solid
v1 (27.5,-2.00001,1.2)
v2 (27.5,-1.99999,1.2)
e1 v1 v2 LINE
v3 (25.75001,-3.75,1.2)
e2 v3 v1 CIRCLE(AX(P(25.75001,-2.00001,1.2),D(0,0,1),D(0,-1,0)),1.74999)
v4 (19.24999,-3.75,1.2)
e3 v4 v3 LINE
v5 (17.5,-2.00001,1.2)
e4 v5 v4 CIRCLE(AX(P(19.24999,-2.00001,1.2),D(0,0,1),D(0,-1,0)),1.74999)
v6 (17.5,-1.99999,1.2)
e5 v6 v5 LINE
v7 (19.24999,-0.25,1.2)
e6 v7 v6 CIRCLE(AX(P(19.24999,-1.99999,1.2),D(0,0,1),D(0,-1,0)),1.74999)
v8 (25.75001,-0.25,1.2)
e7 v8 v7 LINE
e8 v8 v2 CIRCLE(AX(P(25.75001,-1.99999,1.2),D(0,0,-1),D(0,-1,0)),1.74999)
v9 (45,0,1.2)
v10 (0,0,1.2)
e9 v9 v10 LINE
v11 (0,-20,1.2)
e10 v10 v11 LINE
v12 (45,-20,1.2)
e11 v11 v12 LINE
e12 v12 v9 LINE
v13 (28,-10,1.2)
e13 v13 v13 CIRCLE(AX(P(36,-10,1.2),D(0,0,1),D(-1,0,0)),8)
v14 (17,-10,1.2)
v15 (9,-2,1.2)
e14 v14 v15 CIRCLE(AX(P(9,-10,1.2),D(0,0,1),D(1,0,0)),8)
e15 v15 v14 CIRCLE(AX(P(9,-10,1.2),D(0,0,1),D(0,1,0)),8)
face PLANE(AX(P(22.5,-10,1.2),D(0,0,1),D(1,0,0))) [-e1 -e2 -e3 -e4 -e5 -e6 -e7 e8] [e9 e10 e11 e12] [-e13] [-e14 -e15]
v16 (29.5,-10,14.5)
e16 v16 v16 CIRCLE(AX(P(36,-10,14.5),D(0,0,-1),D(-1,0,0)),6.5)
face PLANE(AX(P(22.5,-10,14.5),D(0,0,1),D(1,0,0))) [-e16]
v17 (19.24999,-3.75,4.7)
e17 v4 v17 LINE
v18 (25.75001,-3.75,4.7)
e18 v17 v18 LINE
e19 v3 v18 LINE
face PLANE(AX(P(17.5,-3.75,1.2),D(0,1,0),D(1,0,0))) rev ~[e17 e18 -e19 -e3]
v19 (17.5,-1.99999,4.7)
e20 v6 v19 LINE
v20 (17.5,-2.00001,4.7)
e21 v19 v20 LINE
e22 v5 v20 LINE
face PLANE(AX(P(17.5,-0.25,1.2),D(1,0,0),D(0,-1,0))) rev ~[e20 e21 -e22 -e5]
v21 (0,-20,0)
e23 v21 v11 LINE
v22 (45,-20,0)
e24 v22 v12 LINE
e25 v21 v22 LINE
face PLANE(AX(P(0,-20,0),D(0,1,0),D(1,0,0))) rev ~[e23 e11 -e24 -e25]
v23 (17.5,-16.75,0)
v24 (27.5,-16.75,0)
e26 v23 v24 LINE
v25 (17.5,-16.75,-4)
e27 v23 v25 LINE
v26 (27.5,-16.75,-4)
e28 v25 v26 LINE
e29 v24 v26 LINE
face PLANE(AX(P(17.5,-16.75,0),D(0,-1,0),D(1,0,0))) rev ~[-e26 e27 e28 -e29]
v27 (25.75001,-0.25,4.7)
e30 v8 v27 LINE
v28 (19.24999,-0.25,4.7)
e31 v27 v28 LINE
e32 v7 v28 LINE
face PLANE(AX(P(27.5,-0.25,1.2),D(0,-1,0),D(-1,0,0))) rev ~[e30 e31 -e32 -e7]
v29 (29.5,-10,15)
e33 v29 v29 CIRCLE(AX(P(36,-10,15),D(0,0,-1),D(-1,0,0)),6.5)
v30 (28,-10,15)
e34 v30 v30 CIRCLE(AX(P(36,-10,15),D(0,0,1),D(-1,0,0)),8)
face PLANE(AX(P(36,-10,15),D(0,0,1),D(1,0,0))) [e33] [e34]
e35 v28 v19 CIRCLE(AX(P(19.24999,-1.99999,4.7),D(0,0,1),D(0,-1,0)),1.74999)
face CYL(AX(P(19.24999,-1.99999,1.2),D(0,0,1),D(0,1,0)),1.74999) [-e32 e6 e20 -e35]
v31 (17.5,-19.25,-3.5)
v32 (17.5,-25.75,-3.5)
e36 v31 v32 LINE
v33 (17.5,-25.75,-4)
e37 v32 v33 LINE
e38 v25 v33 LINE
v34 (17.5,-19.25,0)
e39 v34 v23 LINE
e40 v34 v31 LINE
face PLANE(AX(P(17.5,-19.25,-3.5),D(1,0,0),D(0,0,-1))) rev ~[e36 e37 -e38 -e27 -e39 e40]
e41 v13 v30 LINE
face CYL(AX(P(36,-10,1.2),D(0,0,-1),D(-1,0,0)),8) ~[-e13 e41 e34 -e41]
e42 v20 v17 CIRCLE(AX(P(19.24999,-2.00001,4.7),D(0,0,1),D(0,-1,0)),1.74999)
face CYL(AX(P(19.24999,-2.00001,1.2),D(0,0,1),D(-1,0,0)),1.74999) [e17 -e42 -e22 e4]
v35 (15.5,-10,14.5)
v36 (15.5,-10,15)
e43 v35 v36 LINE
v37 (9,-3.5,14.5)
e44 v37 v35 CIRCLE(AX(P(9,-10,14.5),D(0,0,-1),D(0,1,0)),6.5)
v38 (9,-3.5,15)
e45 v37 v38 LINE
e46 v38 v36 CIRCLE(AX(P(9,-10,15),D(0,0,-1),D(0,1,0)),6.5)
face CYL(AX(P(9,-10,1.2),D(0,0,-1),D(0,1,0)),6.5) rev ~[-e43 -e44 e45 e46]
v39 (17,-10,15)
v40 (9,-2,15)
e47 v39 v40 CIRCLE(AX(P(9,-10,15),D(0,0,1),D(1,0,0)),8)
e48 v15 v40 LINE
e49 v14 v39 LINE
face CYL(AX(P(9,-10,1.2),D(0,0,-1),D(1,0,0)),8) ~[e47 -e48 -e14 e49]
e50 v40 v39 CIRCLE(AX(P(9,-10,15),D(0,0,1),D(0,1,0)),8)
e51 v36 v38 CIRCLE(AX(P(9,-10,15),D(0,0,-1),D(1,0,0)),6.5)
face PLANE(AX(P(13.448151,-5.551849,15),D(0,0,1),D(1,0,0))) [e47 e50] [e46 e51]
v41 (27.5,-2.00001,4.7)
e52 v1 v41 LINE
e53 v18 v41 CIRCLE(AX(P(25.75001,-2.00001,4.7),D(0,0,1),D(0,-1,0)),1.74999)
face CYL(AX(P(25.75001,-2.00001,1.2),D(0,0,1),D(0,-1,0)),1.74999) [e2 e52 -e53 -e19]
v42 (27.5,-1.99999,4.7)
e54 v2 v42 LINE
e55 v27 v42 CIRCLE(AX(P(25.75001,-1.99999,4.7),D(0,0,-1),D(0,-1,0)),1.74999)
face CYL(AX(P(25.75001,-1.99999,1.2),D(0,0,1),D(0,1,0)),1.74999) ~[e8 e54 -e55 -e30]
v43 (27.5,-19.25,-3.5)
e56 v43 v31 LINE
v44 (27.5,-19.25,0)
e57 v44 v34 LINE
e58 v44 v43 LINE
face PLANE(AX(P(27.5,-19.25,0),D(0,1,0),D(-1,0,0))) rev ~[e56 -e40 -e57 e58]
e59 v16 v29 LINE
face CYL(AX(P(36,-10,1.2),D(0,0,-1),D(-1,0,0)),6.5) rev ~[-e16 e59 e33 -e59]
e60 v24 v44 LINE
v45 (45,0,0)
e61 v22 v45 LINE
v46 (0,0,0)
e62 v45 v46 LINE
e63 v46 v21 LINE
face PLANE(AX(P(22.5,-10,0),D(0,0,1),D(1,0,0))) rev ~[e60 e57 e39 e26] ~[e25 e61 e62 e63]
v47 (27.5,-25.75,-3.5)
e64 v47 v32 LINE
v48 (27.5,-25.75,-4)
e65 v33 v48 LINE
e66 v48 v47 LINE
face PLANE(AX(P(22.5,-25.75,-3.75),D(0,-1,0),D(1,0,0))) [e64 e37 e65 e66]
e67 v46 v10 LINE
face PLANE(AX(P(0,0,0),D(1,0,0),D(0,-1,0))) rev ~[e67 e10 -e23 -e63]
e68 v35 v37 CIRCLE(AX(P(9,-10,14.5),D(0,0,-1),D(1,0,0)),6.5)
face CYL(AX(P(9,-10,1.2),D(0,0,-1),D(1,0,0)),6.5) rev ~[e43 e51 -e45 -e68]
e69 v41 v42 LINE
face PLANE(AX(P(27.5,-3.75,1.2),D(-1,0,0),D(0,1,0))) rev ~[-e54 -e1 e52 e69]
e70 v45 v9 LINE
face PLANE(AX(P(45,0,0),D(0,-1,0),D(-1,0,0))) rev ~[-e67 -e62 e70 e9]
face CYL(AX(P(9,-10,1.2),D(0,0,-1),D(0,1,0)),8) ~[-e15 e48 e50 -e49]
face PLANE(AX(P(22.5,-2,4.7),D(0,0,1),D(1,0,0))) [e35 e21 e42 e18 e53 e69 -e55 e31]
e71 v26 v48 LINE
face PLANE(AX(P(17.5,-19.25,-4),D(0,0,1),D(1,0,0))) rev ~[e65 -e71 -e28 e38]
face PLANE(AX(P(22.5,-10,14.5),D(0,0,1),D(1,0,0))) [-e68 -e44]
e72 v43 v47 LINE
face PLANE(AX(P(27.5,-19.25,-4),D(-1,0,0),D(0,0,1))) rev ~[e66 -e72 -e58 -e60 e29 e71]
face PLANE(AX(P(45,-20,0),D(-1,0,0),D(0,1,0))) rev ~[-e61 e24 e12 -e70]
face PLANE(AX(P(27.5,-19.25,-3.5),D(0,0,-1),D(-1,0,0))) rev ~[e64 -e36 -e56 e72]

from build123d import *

# Parameters (mm, degrees)
F1_DEPTH = 1.2
F3_DEPTH = 4
F5_DEPTH = 6.5
F7_DEPTH = 13.8
F8_DEPTH = 13.3
F9_DEPTH = 3.5
F10_R    = 1.74999


# Not quite as in the source:
# - a fillet or chamfer is up to 0.001 mm smaller than in the source, because OpenCascade refuses the exact size


with BuildPart() as f1:
    # F0 (on Top) → F1 (new body)
    with BuildSketch(Plane.XY):
        Polygon((9, 0), (0, 0), (0, -20), (45, -20), (45, 0), (36, 0), (22.5, 0), align=None)
    extrude(amount=F1_DEPTH)

    # F2 (on face) → F3 (join)
    with BuildSketch(Plane(origin=(0, 0, 0), x_dir=(1, 0, 0), z_dir=(0, 0, -1))):
        Polygon((22.5, 16.75), (27.5, 16.75), (27.5, 19.25), (17.5, 19.25), (17.5, 16.75), align=None)
    extrude(amount=F3_DEPTH)

    # F4 (on face) → F5 (join)
    with BuildSketch(Plane.XZ.offset(19.25)):
        Polygon((22.5, -3.5), (17.5, -3.5), (17.5, -4), (27.5, -4), (27.5, -3.5), align=None)
    extrude(amount=F5_DEPTH)

    # F6 (on face) → F7 (join)
    with BuildSketch(Plane.XY.offset(1.2)):
        with BuildLine():
            ThreePointArc((44, -10), (36, -2), (28, -10))
            ThreePointArc((28, -10), (36, -18), (44, -10))
        make_face()
        with BuildLine():
            ThreePointArc((42.5, -10), (36, -16.5), (29.5, -10))
            ThreePointArc((29.5, -10), (36, -3.5), (42.5, -10))
        make_face(mode=Mode.SUBTRACT)
        with BuildLine():
            ThreePointArc((17, -10), (14.6568542495, -4.3431457505), (9, -2))
            Line((9, -2), (9, -3.5))
            ThreePointArc((9, -3.5), (13.5961940777, -5.4038059223), (15.5, -10))
            Line((15.5, -10), (17, -10))
        make_face()
        with BuildLine():
            Line((9, -3.5), (9, -2))
            ThreePointArc((9, -2), (3.3431457505, -15.6568542495), (17, -10))
            Line((17, -10), (15.5, -10))
            ThreePointArc((15.5, -10), (4.4038059223, -14.5961940777), (9, -3.5))
        make_face()
    extrude(amount=F7_DEPTH)

    # F8 (add): faces of the model
    f8_faces = [f1.faces().sort_by_distance(p)[0] for p in [
        (9, -10, 1.2),
        (36, -10, 1.2),
    ]]
    extrude(f8_faces, amount=F8_DEPTH)

    # F6 (on face) → F9 (join)
    with BuildSketch(Plane.XY.offset(1.2)):
        Polygon((27.5, -0.25), (22.5, -0.25), (17.5, -0.25), (17.5, -3.75), (27.5, -3.75), align=None)
    extrude(amount=F9_DEPTH)

    # F10 (radius 1.75 in the source; OpenCascade refuses exactly that, so slightly less here)
    f10_edges = [f1.edges().sort_by_distance(p)[0] for p in [
        (27.5, -0.25, 2.95),
        (27.5, -3.75, 2.95),
        (17.5, -0.25, 2.95),
        (17.5, -3.75, 2.95),
    ]]
    fillet(f10_edges, radius=F10_R)


solid = f1.part
